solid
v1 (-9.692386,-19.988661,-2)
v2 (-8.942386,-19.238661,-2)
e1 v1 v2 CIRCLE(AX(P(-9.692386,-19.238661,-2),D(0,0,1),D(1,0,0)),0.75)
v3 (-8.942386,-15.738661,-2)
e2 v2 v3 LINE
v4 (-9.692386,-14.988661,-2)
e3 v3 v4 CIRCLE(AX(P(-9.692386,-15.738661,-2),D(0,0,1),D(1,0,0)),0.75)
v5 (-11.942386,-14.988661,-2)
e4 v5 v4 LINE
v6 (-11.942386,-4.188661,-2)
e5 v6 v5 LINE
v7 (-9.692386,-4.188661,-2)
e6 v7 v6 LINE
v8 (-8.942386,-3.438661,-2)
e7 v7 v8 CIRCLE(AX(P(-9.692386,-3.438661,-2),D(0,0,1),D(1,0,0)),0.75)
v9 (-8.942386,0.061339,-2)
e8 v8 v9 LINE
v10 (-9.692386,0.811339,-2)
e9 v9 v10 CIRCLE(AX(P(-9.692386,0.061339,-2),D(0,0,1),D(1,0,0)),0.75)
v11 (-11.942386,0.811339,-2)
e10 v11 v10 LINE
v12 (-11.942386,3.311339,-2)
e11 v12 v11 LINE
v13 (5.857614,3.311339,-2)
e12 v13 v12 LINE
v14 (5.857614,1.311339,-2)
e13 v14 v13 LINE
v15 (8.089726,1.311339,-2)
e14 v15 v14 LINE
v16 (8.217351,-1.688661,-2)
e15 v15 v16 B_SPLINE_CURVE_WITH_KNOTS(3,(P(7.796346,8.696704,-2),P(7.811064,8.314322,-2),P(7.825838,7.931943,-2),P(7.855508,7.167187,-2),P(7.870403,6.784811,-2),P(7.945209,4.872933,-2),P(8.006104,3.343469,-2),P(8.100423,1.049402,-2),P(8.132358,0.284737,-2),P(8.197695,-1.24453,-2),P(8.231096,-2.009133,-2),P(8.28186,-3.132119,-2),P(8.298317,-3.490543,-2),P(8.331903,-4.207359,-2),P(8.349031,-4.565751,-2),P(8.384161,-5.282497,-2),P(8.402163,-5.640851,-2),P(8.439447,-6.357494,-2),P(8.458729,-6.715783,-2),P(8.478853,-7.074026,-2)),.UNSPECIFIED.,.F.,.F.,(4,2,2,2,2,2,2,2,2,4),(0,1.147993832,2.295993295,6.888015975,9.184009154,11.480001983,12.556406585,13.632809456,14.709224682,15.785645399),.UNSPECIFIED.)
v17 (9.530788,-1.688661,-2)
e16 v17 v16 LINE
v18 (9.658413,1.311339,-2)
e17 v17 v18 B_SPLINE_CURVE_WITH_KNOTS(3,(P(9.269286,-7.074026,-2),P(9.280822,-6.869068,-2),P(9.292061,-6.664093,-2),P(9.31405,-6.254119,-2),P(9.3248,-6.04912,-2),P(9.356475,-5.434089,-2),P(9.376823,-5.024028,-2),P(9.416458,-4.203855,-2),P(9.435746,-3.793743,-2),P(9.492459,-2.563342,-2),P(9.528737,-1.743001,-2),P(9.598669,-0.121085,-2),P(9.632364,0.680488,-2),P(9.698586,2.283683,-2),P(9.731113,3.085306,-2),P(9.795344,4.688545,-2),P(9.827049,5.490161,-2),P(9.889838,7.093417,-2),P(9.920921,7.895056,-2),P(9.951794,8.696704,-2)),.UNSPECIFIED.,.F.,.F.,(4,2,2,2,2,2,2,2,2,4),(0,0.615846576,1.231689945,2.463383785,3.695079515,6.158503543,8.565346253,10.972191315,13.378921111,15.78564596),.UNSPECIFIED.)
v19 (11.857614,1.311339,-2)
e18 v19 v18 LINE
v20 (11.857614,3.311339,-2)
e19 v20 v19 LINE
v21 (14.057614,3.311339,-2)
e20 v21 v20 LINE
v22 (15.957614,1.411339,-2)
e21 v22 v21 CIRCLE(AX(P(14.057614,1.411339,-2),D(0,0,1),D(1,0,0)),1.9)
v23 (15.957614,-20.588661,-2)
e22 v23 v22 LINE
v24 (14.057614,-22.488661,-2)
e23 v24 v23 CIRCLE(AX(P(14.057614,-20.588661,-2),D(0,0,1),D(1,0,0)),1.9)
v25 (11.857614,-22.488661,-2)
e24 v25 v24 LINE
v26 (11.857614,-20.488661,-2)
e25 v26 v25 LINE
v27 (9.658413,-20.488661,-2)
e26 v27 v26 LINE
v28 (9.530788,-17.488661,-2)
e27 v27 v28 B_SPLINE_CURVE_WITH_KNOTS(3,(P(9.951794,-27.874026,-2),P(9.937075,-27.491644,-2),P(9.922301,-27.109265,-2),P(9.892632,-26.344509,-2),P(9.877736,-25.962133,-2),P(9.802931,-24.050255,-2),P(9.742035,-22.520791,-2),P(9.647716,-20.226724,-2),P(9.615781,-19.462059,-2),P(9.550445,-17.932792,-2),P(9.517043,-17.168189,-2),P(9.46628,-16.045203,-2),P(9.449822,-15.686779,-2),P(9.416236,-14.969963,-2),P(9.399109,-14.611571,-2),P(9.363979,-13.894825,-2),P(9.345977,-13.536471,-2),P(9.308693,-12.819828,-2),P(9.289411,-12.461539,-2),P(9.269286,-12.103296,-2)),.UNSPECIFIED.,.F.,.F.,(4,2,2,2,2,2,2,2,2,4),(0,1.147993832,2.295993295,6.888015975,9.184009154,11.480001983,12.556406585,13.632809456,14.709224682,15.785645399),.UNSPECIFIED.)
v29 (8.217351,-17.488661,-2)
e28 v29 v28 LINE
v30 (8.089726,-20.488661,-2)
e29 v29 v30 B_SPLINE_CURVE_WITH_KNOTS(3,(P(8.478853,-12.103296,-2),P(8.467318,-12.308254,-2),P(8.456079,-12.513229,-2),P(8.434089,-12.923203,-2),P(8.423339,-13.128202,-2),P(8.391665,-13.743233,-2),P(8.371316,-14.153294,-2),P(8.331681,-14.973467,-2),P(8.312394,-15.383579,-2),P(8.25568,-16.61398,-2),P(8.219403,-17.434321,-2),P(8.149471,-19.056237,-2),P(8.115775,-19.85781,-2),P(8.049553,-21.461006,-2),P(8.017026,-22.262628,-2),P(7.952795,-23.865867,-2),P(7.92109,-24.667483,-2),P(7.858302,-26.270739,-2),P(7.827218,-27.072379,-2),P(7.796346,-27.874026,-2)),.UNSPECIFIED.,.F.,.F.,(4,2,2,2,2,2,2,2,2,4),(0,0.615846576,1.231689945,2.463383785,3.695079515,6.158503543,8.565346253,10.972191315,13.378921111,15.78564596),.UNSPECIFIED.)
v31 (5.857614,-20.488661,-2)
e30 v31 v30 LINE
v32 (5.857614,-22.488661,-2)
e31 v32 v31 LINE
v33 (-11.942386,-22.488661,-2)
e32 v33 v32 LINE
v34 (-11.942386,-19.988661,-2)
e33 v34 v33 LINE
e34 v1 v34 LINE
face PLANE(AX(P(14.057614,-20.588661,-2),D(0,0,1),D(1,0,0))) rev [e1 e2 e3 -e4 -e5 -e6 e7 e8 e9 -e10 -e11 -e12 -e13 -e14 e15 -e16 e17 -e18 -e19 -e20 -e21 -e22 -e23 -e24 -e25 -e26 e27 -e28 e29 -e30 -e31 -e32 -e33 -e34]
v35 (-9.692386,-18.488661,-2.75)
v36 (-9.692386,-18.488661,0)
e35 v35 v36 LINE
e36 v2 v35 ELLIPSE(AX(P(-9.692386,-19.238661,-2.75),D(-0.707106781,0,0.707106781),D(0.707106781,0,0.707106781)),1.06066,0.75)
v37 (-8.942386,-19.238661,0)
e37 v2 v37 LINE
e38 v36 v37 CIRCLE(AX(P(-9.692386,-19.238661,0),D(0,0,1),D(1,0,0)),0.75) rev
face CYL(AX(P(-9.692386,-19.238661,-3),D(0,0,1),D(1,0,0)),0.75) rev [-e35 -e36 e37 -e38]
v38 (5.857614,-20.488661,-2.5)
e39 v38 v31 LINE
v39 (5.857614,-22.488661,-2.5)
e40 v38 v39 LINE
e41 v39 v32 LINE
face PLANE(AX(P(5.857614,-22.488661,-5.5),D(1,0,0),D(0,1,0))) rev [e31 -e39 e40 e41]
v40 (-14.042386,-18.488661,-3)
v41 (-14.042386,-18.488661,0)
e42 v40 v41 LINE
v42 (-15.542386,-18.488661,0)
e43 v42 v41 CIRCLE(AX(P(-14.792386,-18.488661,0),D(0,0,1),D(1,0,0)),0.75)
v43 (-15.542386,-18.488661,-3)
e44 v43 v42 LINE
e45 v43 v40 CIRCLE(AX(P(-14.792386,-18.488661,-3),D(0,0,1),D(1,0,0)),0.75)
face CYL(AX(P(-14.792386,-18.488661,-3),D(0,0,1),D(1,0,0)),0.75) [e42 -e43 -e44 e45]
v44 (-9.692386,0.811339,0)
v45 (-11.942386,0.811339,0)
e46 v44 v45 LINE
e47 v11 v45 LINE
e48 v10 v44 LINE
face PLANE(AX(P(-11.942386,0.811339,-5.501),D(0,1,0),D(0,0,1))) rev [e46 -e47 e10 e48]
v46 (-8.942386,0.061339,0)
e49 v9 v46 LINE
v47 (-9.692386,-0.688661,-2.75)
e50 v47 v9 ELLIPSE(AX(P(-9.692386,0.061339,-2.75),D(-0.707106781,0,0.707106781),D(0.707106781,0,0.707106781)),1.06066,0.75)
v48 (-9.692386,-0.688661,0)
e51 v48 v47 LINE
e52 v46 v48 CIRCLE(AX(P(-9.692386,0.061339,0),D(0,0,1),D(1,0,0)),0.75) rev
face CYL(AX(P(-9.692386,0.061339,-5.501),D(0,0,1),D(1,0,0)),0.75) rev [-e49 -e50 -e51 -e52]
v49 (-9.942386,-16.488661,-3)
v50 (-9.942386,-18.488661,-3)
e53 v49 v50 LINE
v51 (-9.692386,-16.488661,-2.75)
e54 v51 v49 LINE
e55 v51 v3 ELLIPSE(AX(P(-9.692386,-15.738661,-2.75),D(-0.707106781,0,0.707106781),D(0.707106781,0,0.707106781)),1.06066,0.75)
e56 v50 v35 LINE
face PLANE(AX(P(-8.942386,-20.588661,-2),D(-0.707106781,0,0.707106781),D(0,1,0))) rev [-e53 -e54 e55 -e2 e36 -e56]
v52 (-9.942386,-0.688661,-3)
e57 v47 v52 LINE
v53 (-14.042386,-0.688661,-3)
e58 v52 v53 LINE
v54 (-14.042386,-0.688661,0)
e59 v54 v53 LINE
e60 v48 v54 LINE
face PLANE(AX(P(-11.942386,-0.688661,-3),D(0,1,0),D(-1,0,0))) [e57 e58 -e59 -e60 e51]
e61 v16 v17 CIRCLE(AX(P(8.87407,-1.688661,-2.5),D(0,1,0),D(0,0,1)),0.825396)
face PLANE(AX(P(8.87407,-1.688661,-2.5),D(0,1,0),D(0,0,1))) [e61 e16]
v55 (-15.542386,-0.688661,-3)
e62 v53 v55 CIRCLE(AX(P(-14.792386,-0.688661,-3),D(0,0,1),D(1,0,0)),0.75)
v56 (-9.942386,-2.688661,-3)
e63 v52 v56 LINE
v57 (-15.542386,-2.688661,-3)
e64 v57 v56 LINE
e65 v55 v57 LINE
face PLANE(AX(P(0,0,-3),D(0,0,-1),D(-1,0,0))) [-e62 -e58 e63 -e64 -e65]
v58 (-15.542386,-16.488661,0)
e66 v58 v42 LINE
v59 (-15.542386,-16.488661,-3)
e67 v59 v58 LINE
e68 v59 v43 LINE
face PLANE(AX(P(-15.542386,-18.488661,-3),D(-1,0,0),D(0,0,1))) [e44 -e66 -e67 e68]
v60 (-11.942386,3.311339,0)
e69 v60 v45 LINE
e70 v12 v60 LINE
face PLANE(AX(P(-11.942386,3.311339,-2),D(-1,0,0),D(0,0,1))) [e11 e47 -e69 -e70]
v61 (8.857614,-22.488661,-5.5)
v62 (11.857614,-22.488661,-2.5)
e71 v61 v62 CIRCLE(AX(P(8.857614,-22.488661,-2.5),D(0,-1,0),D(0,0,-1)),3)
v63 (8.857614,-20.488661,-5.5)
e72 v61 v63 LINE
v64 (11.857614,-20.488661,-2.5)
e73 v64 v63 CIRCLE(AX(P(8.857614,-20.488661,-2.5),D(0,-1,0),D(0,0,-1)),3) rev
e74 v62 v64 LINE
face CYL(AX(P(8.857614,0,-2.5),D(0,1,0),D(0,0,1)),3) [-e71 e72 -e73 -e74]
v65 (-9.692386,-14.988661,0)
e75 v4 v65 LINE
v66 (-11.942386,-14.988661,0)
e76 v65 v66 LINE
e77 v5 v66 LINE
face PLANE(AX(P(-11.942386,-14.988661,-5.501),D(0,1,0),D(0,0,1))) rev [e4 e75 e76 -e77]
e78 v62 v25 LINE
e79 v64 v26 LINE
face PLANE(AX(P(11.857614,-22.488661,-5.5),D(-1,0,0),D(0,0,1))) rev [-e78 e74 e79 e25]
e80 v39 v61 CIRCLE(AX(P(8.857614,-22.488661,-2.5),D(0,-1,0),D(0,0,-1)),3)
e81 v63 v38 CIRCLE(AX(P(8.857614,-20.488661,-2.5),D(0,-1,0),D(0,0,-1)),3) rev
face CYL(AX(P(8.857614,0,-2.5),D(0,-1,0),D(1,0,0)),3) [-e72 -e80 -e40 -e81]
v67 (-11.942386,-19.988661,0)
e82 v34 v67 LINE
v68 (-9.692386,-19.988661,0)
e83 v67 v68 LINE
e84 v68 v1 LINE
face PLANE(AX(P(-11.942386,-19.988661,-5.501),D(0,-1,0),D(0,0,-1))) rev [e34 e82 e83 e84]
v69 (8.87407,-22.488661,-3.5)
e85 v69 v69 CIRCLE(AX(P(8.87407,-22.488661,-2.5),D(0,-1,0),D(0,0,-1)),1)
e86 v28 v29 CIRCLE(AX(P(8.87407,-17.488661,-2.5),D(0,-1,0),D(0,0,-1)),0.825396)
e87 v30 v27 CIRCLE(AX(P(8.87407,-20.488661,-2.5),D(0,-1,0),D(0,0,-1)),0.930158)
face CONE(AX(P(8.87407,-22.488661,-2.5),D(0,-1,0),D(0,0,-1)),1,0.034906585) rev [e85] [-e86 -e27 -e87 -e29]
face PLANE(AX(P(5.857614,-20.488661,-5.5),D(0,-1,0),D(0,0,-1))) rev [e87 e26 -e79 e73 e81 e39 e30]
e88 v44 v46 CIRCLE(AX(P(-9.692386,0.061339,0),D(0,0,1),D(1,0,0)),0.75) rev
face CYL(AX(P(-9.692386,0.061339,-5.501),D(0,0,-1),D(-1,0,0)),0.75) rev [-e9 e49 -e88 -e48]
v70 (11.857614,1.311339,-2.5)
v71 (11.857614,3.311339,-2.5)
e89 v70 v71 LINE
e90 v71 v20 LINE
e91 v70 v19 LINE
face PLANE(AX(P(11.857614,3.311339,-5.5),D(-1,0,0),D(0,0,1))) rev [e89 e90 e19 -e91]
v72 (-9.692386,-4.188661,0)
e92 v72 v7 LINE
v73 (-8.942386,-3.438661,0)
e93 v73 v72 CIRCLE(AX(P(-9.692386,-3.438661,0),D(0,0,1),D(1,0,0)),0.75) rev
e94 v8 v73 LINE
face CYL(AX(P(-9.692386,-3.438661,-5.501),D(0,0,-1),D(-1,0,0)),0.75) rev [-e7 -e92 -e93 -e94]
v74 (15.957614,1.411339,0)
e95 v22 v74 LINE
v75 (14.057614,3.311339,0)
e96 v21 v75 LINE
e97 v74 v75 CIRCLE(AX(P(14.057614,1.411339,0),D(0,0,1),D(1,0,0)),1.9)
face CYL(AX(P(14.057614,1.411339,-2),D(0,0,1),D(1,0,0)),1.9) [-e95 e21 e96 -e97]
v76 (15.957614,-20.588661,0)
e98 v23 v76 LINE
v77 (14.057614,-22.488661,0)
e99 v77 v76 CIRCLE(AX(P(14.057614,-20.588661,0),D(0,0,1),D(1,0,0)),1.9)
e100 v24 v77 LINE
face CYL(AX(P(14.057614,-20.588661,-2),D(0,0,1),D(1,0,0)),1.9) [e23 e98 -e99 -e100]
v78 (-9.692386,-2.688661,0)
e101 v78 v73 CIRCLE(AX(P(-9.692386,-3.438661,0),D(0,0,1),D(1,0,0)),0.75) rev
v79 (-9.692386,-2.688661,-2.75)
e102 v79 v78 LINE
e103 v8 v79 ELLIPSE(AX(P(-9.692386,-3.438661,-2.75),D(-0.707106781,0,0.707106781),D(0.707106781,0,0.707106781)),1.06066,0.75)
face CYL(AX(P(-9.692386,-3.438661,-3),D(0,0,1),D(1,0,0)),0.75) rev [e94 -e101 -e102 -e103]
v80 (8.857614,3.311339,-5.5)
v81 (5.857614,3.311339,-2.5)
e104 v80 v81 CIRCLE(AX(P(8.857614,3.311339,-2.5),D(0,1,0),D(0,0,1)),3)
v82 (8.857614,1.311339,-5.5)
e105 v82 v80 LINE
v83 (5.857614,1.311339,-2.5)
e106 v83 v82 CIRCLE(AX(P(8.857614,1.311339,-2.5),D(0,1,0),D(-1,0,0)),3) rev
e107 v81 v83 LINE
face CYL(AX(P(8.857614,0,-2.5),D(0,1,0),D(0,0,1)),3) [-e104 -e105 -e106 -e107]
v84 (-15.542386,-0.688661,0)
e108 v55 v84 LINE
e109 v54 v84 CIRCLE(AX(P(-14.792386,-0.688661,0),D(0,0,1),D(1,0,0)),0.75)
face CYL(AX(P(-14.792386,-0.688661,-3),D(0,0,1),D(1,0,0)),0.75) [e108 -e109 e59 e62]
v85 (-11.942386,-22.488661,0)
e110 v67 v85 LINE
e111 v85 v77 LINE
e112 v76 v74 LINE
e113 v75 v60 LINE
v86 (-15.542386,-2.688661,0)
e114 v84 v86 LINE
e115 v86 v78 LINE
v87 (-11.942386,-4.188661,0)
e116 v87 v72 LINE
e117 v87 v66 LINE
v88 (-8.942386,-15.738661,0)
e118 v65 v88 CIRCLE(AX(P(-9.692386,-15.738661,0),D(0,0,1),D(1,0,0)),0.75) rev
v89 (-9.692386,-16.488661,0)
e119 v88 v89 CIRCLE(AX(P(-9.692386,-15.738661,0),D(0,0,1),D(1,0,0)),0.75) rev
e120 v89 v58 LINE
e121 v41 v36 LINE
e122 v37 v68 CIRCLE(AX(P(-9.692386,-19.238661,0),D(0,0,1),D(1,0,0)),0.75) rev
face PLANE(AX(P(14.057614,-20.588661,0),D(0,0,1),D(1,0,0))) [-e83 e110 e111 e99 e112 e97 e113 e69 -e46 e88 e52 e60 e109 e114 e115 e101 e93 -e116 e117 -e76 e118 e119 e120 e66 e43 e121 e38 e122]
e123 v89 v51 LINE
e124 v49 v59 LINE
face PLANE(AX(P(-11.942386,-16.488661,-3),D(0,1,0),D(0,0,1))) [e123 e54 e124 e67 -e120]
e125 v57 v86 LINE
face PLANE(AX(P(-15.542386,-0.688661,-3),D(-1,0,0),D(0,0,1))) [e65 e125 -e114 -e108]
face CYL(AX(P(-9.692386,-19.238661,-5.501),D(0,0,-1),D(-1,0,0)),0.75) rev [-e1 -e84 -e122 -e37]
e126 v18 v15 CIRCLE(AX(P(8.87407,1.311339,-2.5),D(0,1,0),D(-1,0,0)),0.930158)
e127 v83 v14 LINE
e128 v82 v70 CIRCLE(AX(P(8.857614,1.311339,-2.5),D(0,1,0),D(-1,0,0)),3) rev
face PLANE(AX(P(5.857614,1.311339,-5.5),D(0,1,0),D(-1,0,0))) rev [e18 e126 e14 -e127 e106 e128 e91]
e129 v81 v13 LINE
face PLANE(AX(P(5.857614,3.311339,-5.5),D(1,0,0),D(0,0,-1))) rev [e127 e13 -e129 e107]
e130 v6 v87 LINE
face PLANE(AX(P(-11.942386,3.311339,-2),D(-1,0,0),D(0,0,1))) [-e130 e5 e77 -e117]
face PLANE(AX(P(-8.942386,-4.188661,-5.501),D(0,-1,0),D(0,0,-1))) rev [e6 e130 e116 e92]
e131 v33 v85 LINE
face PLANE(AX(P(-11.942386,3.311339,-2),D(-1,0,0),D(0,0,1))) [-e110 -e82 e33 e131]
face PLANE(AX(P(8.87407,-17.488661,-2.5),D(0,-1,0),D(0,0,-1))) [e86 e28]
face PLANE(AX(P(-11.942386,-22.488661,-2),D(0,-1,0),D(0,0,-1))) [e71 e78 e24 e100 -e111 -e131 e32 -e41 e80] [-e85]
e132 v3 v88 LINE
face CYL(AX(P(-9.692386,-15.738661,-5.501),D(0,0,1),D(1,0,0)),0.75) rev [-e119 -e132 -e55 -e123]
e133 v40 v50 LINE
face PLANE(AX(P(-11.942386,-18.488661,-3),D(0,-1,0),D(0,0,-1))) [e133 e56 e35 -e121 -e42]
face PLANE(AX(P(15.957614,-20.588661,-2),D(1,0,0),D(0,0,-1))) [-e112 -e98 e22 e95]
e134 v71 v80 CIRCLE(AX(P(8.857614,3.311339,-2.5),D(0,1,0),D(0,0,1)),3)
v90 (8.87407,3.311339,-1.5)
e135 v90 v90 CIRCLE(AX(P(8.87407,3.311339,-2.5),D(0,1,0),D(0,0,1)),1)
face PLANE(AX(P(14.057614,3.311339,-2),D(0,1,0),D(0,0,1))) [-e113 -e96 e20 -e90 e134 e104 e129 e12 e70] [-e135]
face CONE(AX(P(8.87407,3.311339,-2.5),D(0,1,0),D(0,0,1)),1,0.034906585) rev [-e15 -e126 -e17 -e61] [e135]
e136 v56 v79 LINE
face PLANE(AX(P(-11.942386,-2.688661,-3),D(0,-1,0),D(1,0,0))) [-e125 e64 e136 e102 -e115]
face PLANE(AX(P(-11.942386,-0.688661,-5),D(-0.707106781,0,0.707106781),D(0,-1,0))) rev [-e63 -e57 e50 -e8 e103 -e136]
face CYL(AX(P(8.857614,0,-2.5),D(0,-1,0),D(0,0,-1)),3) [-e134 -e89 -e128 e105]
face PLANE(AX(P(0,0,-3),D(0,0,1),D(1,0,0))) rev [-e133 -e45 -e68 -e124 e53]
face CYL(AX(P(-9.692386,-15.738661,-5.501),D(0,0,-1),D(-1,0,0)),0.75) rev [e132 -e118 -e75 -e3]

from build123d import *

# Parameters (mm, degrees)
EXTRUDE_1_DEPTH     = 2
SKETCH_2_W          = 6
SKETCH_2_H          = 2
EXTRUDE_2_DEPTH     = 3.5
FILLET_1_R          = 3
SKETCH_3_R          = 1
CUT_EXTRUDE_1_DEPTH = 5
CUT_EXTRUDE_1_DRAFT = -2
SKETCH_4_R          = 1
CUT_EXTRUDE_2_DEPTH = 5
CUT_EXTRUDE_2_DRAFT = -2
SKETCH_6_W          = 3.6
SKETCH_6_H          = 2
EXTRUDE_3_DEPTH     = 3
CHAMFER_1_SIZE      = 3
SKETCH_7_R          = 0.75
EXTRUDE_4_DEPTH     = 3
CUT_EXTRUDE_3_REACH = 30.118
SKETCH_8_W          = 3
SKETCH_8_H          = 1.5
FILLET_2_R          = 0.75


# Some blends are built 0.0001 mm under size
with BuildPart() as part:
    # 草图1 → 凸台-拉伸1 (new body)
    with BuildSketch(Plane.XY):
        with BuildLine():
            Line((-11.942385676, 3.311338927), (-11.942385676, -22.488661073))
            Line((-11.942385676, -22.488661073), (14.057614324, -22.488661073))
            ThreePointArc((14.057614324, -22.488661073), (15.401117208, -21.932163957), (15.957614324, -20.588661073))
            Line((15.957614324, -20.588661073), (15.957614324, 1.411338927))
            ThreePointArc((15.957614324, 1.411338927), (15.401117208, 2.754841811), (14.057614324, 3.311338927))
            Line((14.057614324, 3.311338927), (-11.942385676, 3.311338927))
        make_face()
    extrude(amount=-EXTRUDE_1_DEPTH)

    # 草图2 → 凸台-拉伸2 (add)
    with BuildSketch(Plane(origin=(0, 0, -2), x_dir=(-1, 0, 0), z_dir=(0, 0, -1))):
        with Locations((-8.857614324, -21.488661073)):
            Rectangle(SKETCH_2_W, SKETCH_2_H)
        with Locations((-8.857614324, 2.311338927)):
            Rectangle(SKETCH_2_W, SKETCH_2_H)
    extrude(amount=EXTRUDE_2_DEPTH)

    # 圆角1
    fillet_1_edges = [part.edges().sort_by_distance(p)[0] for p in [
        (11.857614324, 2.311338927, -5.5),
        (5.857614324, 2.311338927, -5.5),
        (11.857614324, -21.488661073, -5.5),
        (5.857614324, -21.488661073, -5.5),
    ]]
    fillet(fillet_1_edges, radius=FILLET_1_R - 0.0001)  # a hair under: the kernel refuses the full size


with BuildPart() as cut_extrude_1_tool:
    # 草图3 → 切除-拉伸1 (with draft: the straight prism first)
    with BuildSketch(Plane.XZ.offset(22.488661073)):
        with Locations((8.874069652, -2.5)):
            Circle(SKETCH_3_R)
    extrude(amount=-CUT_EXTRUDE_1_DEPTH)
    # 切除-拉伸1: the draft: its side faces are tilted about the plane it starts from
    cut_extrude_1_sides = [cut_extrude_1_tool.faces().sort_by_distance(p)[0] for p in [
        (7.874069652, -19.988661073, -2.5),
    ]]
    draft(cut_extrude_1_sides, Plane.XZ.offset(22.488661073), CUT_EXTRUDE_1_DRAFT)


with BuildPart() as part_1:
    add(part.part)

    # 切除-拉伸1: cut by cut_extrude_1_tool
    add(cut_extrude_1_tool.part, mode=Mode.SUBTRACT)


with BuildPart() as cut_extrude_2_tool:
    # 草图4 → 切除-拉伸2 (with draft: the straight prism first)
    with BuildSketch(Plane(origin=(0, 3.311338927, 0), x_dir=(1, 0, 0), z_dir=(0, 1, 0))):
        with Locations((8.874069652, 2.5)):
            Circle(SKETCH_4_R)
    extrude(amount=-CUT_EXTRUDE_2_DEPTH)
    # 切除-拉伸2: the draft: its side faces are tilted about the plane it starts from
    cut_extrude_2_sides = [cut_extrude_2_tool.faces().sort_by_distance(p)[0] for p in [
        (7.874069652, 0.811338927, -2.5),
    ]]
    draft(cut_extrude_2_sides, Plane(origin=(0, 3.311338927, 0), x_dir=(1, 0, 0), z_dir=(0, 1, 0)), CUT_EXTRUDE_2_DRAFT)


with BuildPart() as part_2:
    add(part_1.part)

    # 切除-拉伸2: cut by cut_extrude_2_tool
    add(cut_extrude_2_tool.part, mode=Mode.SUBTRACT)

    # 草图6 → 凸台-拉伸3 (add)
    with BuildSketch(Plane.XY):
        with Locations((-13.742385676, -1.688661073)):
            Rectangle(SKETCH_6_W, SKETCH_6_H)
        with Locations((-13.742385676, -17.488661073)):
            Rectangle(SKETCH_6_W, SKETCH_6_H)
    extrude(amount=-EXTRUDE_3_DEPTH)

    # 倒角1
    # the kernel refuses this chamfer: 3 mm, written as the material it adds along each edge
    with BuildSketch(Plane(origin=(-11.942385676, -16.488661073, -2), x_dir=(0.9996219169112969, 0, 0.027495876610586355), z_dir=(0, -1, 0))) as chamfer_1_piece_1_section:
        Polygon((CHAMFER_1_SIZE * 0.999621916911, -CHAMFER_1_SIZE * 0.0274958766106), (-CHAMFER_1_SIZE * 0.0274958766106, -CHAMFER_1_SIZE * 0.999621916911), (0, 0), align=None)
    chamfer_1_piece_1 = extrude(amount=2, mode=Mode.PRIVATE)
    chamfer_1_piece_1 = split(chamfer_1_piece_1, bisect_by=Plane(origin=(-10.675719009, -17.488661073, -3), z_dir=(0, 0, 1)), keep=Keep.TOP, mode=Mode.PRIVATE)
    add(chamfer_1_piece_1)
    with BuildSketch(Plane(origin=(-11.942385676, -0.688661073, -2), x_dir=(0.9996219169112969, 0, 0.027495876610586355), z_dir=(0, -1, 0))) as chamfer_1_piece_2_section:
        Polygon((CHAMFER_1_SIZE * 0.999621916911, -CHAMFER_1_SIZE * 0.0274958766106), (-CHAMFER_1_SIZE * 0.0274958766106, -CHAMFER_1_SIZE * 0.999621916911), (0, 0), align=None)
    chamfer_1_piece_2 = extrude(amount=2, mode=Mode.PRIVATE)
    chamfer_1_piece_2 = split(chamfer_1_piece_2, bisect_by=Plane(origin=(-10.675719009, -1.688661073, -3), z_dir=(0, 0, 1)), keep=Keep.TOP, mode=Mode.PRIVATE)
    add(chamfer_1_piece_2)

    # 草图7 → 凸台-拉伸4 (add)
    with BuildSketch(Plane.XY):
        with Locations((-14.792385676, -0.688661073)):
            Circle(SKETCH_7_R)
        with Locations((-14.792385676, -18.488661073)):
            Circle(SKETCH_7_R)
    extrude(amount=-EXTRUDE_4_DEPTH)

    # 草图8 → 切除-拉伸3 (cut, up to next)
    with BuildSketch(Plane.XY, mode=Mode.PRIVATE) as cut_extrude_3_sk1:
        with Locations((-10.442385676, -3.438661073)):
            Rectangle(SKETCH_8_W, SKETCH_8_H)
    cut_extrude_3_tool1 = extrude(cut_extrude_3_sk1.sketch, amount=-CUT_EXTRUDE_3_REACH, mode=Mode.PRIVATE) & part_2.part
    # 草图8 → 切除-拉伸3 (cut, up to next)
    with BuildSketch(Plane.XY, mode=Mode.PRIVATE) as cut_extrude_3_sk2:
        with Locations((-10.442385676, 0.061338927)):
            Rectangle(SKETCH_8_W, SKETCH_8_H)
    cut_extrude_3_tool2 = extrude(cut_extrude_3_sk2.sketch, amount=-CUT_EXTRUDE_3_REACH, mode=Mode.PRIVATE) & part_2.part
    # 草图8 → 切除-拉伸3 (cut, up to next)
    with BuildSketch(Plane.XY, mode=Mode.PRIVATE) as cut_extrude_3_sk3:
        with Locations((-10.442385676, -15.738661073)):
            Rectangle(SKETCH_8_W, SKETCH_8_H)
    cut_extrude_3_tool3 = extrude(cut_extrude_3_sk3.sketch, amount=-CUT_EXTRUDE_3_REACH, mode=Mode.PRIVATE) & part_2.part
    # 草图8 → 切除-拉伸3 (cut, up to next)
    with BuildSketch(Plane.XY, mode=Mode.PRIVATE) as cut_extrude_3_sk4:
        with Locations((-10.442385676, -19.238661073)):
            Rectangle(SKETCH_8_W, SKETCH_8_H)
    cut_extrude_3_tool4 = extrude(cut_extrude_3_sk4.sketch, amount=-CUT_EXTRUDE_3_REACH, mode=Mode.PRIVATE) & part_2.part
    add(cut_extrude_3_tool1.solids().sort_by_distance((-10.442386, -3.438661, 0))[0], mode=Mode.SUBTRACT)
    add(cut_extrude_3_tool2.solids().sort_by_distance((-10.442386, 0.061339, 0))[0], mode=Mode.SUBTRACT)
    add(cut_extrude_3_tool3.solids().sort_by_distance((-10.442386, -15.738661, 0))[0], mode=Mode.SUBTRACT)
    add(cut_extrude_3_tool4.solids().sort_by_distance((-10.442386, -19.238661, 0))[0], mode=Mode.SUBTRACT)

    # 圆角2
    fillet_2_edges = [part_2.edges().sort_by_distance(p)[0] for p in [
        (-8.942385676, -2.688661073, -1),
        (-8.942385676, 0.811338927, -1),
        (-8.942385676, -18.488661073, -1),
        (-8.942385676, -14.988661073, -1),
        (-8.942385676, -19.988661073, -1),
        (-8.942385676, -16.488661073, -1),
        (-8.942385676, -4.188661073, -1),
        (-8.942385676, -0.688661073, -1),
    ]]
    fillet(fillet_2_edges, radius=FILLET_2_R - 0.0001)  # a hair under: the kernel refuses the full size


solid = part_2.part
